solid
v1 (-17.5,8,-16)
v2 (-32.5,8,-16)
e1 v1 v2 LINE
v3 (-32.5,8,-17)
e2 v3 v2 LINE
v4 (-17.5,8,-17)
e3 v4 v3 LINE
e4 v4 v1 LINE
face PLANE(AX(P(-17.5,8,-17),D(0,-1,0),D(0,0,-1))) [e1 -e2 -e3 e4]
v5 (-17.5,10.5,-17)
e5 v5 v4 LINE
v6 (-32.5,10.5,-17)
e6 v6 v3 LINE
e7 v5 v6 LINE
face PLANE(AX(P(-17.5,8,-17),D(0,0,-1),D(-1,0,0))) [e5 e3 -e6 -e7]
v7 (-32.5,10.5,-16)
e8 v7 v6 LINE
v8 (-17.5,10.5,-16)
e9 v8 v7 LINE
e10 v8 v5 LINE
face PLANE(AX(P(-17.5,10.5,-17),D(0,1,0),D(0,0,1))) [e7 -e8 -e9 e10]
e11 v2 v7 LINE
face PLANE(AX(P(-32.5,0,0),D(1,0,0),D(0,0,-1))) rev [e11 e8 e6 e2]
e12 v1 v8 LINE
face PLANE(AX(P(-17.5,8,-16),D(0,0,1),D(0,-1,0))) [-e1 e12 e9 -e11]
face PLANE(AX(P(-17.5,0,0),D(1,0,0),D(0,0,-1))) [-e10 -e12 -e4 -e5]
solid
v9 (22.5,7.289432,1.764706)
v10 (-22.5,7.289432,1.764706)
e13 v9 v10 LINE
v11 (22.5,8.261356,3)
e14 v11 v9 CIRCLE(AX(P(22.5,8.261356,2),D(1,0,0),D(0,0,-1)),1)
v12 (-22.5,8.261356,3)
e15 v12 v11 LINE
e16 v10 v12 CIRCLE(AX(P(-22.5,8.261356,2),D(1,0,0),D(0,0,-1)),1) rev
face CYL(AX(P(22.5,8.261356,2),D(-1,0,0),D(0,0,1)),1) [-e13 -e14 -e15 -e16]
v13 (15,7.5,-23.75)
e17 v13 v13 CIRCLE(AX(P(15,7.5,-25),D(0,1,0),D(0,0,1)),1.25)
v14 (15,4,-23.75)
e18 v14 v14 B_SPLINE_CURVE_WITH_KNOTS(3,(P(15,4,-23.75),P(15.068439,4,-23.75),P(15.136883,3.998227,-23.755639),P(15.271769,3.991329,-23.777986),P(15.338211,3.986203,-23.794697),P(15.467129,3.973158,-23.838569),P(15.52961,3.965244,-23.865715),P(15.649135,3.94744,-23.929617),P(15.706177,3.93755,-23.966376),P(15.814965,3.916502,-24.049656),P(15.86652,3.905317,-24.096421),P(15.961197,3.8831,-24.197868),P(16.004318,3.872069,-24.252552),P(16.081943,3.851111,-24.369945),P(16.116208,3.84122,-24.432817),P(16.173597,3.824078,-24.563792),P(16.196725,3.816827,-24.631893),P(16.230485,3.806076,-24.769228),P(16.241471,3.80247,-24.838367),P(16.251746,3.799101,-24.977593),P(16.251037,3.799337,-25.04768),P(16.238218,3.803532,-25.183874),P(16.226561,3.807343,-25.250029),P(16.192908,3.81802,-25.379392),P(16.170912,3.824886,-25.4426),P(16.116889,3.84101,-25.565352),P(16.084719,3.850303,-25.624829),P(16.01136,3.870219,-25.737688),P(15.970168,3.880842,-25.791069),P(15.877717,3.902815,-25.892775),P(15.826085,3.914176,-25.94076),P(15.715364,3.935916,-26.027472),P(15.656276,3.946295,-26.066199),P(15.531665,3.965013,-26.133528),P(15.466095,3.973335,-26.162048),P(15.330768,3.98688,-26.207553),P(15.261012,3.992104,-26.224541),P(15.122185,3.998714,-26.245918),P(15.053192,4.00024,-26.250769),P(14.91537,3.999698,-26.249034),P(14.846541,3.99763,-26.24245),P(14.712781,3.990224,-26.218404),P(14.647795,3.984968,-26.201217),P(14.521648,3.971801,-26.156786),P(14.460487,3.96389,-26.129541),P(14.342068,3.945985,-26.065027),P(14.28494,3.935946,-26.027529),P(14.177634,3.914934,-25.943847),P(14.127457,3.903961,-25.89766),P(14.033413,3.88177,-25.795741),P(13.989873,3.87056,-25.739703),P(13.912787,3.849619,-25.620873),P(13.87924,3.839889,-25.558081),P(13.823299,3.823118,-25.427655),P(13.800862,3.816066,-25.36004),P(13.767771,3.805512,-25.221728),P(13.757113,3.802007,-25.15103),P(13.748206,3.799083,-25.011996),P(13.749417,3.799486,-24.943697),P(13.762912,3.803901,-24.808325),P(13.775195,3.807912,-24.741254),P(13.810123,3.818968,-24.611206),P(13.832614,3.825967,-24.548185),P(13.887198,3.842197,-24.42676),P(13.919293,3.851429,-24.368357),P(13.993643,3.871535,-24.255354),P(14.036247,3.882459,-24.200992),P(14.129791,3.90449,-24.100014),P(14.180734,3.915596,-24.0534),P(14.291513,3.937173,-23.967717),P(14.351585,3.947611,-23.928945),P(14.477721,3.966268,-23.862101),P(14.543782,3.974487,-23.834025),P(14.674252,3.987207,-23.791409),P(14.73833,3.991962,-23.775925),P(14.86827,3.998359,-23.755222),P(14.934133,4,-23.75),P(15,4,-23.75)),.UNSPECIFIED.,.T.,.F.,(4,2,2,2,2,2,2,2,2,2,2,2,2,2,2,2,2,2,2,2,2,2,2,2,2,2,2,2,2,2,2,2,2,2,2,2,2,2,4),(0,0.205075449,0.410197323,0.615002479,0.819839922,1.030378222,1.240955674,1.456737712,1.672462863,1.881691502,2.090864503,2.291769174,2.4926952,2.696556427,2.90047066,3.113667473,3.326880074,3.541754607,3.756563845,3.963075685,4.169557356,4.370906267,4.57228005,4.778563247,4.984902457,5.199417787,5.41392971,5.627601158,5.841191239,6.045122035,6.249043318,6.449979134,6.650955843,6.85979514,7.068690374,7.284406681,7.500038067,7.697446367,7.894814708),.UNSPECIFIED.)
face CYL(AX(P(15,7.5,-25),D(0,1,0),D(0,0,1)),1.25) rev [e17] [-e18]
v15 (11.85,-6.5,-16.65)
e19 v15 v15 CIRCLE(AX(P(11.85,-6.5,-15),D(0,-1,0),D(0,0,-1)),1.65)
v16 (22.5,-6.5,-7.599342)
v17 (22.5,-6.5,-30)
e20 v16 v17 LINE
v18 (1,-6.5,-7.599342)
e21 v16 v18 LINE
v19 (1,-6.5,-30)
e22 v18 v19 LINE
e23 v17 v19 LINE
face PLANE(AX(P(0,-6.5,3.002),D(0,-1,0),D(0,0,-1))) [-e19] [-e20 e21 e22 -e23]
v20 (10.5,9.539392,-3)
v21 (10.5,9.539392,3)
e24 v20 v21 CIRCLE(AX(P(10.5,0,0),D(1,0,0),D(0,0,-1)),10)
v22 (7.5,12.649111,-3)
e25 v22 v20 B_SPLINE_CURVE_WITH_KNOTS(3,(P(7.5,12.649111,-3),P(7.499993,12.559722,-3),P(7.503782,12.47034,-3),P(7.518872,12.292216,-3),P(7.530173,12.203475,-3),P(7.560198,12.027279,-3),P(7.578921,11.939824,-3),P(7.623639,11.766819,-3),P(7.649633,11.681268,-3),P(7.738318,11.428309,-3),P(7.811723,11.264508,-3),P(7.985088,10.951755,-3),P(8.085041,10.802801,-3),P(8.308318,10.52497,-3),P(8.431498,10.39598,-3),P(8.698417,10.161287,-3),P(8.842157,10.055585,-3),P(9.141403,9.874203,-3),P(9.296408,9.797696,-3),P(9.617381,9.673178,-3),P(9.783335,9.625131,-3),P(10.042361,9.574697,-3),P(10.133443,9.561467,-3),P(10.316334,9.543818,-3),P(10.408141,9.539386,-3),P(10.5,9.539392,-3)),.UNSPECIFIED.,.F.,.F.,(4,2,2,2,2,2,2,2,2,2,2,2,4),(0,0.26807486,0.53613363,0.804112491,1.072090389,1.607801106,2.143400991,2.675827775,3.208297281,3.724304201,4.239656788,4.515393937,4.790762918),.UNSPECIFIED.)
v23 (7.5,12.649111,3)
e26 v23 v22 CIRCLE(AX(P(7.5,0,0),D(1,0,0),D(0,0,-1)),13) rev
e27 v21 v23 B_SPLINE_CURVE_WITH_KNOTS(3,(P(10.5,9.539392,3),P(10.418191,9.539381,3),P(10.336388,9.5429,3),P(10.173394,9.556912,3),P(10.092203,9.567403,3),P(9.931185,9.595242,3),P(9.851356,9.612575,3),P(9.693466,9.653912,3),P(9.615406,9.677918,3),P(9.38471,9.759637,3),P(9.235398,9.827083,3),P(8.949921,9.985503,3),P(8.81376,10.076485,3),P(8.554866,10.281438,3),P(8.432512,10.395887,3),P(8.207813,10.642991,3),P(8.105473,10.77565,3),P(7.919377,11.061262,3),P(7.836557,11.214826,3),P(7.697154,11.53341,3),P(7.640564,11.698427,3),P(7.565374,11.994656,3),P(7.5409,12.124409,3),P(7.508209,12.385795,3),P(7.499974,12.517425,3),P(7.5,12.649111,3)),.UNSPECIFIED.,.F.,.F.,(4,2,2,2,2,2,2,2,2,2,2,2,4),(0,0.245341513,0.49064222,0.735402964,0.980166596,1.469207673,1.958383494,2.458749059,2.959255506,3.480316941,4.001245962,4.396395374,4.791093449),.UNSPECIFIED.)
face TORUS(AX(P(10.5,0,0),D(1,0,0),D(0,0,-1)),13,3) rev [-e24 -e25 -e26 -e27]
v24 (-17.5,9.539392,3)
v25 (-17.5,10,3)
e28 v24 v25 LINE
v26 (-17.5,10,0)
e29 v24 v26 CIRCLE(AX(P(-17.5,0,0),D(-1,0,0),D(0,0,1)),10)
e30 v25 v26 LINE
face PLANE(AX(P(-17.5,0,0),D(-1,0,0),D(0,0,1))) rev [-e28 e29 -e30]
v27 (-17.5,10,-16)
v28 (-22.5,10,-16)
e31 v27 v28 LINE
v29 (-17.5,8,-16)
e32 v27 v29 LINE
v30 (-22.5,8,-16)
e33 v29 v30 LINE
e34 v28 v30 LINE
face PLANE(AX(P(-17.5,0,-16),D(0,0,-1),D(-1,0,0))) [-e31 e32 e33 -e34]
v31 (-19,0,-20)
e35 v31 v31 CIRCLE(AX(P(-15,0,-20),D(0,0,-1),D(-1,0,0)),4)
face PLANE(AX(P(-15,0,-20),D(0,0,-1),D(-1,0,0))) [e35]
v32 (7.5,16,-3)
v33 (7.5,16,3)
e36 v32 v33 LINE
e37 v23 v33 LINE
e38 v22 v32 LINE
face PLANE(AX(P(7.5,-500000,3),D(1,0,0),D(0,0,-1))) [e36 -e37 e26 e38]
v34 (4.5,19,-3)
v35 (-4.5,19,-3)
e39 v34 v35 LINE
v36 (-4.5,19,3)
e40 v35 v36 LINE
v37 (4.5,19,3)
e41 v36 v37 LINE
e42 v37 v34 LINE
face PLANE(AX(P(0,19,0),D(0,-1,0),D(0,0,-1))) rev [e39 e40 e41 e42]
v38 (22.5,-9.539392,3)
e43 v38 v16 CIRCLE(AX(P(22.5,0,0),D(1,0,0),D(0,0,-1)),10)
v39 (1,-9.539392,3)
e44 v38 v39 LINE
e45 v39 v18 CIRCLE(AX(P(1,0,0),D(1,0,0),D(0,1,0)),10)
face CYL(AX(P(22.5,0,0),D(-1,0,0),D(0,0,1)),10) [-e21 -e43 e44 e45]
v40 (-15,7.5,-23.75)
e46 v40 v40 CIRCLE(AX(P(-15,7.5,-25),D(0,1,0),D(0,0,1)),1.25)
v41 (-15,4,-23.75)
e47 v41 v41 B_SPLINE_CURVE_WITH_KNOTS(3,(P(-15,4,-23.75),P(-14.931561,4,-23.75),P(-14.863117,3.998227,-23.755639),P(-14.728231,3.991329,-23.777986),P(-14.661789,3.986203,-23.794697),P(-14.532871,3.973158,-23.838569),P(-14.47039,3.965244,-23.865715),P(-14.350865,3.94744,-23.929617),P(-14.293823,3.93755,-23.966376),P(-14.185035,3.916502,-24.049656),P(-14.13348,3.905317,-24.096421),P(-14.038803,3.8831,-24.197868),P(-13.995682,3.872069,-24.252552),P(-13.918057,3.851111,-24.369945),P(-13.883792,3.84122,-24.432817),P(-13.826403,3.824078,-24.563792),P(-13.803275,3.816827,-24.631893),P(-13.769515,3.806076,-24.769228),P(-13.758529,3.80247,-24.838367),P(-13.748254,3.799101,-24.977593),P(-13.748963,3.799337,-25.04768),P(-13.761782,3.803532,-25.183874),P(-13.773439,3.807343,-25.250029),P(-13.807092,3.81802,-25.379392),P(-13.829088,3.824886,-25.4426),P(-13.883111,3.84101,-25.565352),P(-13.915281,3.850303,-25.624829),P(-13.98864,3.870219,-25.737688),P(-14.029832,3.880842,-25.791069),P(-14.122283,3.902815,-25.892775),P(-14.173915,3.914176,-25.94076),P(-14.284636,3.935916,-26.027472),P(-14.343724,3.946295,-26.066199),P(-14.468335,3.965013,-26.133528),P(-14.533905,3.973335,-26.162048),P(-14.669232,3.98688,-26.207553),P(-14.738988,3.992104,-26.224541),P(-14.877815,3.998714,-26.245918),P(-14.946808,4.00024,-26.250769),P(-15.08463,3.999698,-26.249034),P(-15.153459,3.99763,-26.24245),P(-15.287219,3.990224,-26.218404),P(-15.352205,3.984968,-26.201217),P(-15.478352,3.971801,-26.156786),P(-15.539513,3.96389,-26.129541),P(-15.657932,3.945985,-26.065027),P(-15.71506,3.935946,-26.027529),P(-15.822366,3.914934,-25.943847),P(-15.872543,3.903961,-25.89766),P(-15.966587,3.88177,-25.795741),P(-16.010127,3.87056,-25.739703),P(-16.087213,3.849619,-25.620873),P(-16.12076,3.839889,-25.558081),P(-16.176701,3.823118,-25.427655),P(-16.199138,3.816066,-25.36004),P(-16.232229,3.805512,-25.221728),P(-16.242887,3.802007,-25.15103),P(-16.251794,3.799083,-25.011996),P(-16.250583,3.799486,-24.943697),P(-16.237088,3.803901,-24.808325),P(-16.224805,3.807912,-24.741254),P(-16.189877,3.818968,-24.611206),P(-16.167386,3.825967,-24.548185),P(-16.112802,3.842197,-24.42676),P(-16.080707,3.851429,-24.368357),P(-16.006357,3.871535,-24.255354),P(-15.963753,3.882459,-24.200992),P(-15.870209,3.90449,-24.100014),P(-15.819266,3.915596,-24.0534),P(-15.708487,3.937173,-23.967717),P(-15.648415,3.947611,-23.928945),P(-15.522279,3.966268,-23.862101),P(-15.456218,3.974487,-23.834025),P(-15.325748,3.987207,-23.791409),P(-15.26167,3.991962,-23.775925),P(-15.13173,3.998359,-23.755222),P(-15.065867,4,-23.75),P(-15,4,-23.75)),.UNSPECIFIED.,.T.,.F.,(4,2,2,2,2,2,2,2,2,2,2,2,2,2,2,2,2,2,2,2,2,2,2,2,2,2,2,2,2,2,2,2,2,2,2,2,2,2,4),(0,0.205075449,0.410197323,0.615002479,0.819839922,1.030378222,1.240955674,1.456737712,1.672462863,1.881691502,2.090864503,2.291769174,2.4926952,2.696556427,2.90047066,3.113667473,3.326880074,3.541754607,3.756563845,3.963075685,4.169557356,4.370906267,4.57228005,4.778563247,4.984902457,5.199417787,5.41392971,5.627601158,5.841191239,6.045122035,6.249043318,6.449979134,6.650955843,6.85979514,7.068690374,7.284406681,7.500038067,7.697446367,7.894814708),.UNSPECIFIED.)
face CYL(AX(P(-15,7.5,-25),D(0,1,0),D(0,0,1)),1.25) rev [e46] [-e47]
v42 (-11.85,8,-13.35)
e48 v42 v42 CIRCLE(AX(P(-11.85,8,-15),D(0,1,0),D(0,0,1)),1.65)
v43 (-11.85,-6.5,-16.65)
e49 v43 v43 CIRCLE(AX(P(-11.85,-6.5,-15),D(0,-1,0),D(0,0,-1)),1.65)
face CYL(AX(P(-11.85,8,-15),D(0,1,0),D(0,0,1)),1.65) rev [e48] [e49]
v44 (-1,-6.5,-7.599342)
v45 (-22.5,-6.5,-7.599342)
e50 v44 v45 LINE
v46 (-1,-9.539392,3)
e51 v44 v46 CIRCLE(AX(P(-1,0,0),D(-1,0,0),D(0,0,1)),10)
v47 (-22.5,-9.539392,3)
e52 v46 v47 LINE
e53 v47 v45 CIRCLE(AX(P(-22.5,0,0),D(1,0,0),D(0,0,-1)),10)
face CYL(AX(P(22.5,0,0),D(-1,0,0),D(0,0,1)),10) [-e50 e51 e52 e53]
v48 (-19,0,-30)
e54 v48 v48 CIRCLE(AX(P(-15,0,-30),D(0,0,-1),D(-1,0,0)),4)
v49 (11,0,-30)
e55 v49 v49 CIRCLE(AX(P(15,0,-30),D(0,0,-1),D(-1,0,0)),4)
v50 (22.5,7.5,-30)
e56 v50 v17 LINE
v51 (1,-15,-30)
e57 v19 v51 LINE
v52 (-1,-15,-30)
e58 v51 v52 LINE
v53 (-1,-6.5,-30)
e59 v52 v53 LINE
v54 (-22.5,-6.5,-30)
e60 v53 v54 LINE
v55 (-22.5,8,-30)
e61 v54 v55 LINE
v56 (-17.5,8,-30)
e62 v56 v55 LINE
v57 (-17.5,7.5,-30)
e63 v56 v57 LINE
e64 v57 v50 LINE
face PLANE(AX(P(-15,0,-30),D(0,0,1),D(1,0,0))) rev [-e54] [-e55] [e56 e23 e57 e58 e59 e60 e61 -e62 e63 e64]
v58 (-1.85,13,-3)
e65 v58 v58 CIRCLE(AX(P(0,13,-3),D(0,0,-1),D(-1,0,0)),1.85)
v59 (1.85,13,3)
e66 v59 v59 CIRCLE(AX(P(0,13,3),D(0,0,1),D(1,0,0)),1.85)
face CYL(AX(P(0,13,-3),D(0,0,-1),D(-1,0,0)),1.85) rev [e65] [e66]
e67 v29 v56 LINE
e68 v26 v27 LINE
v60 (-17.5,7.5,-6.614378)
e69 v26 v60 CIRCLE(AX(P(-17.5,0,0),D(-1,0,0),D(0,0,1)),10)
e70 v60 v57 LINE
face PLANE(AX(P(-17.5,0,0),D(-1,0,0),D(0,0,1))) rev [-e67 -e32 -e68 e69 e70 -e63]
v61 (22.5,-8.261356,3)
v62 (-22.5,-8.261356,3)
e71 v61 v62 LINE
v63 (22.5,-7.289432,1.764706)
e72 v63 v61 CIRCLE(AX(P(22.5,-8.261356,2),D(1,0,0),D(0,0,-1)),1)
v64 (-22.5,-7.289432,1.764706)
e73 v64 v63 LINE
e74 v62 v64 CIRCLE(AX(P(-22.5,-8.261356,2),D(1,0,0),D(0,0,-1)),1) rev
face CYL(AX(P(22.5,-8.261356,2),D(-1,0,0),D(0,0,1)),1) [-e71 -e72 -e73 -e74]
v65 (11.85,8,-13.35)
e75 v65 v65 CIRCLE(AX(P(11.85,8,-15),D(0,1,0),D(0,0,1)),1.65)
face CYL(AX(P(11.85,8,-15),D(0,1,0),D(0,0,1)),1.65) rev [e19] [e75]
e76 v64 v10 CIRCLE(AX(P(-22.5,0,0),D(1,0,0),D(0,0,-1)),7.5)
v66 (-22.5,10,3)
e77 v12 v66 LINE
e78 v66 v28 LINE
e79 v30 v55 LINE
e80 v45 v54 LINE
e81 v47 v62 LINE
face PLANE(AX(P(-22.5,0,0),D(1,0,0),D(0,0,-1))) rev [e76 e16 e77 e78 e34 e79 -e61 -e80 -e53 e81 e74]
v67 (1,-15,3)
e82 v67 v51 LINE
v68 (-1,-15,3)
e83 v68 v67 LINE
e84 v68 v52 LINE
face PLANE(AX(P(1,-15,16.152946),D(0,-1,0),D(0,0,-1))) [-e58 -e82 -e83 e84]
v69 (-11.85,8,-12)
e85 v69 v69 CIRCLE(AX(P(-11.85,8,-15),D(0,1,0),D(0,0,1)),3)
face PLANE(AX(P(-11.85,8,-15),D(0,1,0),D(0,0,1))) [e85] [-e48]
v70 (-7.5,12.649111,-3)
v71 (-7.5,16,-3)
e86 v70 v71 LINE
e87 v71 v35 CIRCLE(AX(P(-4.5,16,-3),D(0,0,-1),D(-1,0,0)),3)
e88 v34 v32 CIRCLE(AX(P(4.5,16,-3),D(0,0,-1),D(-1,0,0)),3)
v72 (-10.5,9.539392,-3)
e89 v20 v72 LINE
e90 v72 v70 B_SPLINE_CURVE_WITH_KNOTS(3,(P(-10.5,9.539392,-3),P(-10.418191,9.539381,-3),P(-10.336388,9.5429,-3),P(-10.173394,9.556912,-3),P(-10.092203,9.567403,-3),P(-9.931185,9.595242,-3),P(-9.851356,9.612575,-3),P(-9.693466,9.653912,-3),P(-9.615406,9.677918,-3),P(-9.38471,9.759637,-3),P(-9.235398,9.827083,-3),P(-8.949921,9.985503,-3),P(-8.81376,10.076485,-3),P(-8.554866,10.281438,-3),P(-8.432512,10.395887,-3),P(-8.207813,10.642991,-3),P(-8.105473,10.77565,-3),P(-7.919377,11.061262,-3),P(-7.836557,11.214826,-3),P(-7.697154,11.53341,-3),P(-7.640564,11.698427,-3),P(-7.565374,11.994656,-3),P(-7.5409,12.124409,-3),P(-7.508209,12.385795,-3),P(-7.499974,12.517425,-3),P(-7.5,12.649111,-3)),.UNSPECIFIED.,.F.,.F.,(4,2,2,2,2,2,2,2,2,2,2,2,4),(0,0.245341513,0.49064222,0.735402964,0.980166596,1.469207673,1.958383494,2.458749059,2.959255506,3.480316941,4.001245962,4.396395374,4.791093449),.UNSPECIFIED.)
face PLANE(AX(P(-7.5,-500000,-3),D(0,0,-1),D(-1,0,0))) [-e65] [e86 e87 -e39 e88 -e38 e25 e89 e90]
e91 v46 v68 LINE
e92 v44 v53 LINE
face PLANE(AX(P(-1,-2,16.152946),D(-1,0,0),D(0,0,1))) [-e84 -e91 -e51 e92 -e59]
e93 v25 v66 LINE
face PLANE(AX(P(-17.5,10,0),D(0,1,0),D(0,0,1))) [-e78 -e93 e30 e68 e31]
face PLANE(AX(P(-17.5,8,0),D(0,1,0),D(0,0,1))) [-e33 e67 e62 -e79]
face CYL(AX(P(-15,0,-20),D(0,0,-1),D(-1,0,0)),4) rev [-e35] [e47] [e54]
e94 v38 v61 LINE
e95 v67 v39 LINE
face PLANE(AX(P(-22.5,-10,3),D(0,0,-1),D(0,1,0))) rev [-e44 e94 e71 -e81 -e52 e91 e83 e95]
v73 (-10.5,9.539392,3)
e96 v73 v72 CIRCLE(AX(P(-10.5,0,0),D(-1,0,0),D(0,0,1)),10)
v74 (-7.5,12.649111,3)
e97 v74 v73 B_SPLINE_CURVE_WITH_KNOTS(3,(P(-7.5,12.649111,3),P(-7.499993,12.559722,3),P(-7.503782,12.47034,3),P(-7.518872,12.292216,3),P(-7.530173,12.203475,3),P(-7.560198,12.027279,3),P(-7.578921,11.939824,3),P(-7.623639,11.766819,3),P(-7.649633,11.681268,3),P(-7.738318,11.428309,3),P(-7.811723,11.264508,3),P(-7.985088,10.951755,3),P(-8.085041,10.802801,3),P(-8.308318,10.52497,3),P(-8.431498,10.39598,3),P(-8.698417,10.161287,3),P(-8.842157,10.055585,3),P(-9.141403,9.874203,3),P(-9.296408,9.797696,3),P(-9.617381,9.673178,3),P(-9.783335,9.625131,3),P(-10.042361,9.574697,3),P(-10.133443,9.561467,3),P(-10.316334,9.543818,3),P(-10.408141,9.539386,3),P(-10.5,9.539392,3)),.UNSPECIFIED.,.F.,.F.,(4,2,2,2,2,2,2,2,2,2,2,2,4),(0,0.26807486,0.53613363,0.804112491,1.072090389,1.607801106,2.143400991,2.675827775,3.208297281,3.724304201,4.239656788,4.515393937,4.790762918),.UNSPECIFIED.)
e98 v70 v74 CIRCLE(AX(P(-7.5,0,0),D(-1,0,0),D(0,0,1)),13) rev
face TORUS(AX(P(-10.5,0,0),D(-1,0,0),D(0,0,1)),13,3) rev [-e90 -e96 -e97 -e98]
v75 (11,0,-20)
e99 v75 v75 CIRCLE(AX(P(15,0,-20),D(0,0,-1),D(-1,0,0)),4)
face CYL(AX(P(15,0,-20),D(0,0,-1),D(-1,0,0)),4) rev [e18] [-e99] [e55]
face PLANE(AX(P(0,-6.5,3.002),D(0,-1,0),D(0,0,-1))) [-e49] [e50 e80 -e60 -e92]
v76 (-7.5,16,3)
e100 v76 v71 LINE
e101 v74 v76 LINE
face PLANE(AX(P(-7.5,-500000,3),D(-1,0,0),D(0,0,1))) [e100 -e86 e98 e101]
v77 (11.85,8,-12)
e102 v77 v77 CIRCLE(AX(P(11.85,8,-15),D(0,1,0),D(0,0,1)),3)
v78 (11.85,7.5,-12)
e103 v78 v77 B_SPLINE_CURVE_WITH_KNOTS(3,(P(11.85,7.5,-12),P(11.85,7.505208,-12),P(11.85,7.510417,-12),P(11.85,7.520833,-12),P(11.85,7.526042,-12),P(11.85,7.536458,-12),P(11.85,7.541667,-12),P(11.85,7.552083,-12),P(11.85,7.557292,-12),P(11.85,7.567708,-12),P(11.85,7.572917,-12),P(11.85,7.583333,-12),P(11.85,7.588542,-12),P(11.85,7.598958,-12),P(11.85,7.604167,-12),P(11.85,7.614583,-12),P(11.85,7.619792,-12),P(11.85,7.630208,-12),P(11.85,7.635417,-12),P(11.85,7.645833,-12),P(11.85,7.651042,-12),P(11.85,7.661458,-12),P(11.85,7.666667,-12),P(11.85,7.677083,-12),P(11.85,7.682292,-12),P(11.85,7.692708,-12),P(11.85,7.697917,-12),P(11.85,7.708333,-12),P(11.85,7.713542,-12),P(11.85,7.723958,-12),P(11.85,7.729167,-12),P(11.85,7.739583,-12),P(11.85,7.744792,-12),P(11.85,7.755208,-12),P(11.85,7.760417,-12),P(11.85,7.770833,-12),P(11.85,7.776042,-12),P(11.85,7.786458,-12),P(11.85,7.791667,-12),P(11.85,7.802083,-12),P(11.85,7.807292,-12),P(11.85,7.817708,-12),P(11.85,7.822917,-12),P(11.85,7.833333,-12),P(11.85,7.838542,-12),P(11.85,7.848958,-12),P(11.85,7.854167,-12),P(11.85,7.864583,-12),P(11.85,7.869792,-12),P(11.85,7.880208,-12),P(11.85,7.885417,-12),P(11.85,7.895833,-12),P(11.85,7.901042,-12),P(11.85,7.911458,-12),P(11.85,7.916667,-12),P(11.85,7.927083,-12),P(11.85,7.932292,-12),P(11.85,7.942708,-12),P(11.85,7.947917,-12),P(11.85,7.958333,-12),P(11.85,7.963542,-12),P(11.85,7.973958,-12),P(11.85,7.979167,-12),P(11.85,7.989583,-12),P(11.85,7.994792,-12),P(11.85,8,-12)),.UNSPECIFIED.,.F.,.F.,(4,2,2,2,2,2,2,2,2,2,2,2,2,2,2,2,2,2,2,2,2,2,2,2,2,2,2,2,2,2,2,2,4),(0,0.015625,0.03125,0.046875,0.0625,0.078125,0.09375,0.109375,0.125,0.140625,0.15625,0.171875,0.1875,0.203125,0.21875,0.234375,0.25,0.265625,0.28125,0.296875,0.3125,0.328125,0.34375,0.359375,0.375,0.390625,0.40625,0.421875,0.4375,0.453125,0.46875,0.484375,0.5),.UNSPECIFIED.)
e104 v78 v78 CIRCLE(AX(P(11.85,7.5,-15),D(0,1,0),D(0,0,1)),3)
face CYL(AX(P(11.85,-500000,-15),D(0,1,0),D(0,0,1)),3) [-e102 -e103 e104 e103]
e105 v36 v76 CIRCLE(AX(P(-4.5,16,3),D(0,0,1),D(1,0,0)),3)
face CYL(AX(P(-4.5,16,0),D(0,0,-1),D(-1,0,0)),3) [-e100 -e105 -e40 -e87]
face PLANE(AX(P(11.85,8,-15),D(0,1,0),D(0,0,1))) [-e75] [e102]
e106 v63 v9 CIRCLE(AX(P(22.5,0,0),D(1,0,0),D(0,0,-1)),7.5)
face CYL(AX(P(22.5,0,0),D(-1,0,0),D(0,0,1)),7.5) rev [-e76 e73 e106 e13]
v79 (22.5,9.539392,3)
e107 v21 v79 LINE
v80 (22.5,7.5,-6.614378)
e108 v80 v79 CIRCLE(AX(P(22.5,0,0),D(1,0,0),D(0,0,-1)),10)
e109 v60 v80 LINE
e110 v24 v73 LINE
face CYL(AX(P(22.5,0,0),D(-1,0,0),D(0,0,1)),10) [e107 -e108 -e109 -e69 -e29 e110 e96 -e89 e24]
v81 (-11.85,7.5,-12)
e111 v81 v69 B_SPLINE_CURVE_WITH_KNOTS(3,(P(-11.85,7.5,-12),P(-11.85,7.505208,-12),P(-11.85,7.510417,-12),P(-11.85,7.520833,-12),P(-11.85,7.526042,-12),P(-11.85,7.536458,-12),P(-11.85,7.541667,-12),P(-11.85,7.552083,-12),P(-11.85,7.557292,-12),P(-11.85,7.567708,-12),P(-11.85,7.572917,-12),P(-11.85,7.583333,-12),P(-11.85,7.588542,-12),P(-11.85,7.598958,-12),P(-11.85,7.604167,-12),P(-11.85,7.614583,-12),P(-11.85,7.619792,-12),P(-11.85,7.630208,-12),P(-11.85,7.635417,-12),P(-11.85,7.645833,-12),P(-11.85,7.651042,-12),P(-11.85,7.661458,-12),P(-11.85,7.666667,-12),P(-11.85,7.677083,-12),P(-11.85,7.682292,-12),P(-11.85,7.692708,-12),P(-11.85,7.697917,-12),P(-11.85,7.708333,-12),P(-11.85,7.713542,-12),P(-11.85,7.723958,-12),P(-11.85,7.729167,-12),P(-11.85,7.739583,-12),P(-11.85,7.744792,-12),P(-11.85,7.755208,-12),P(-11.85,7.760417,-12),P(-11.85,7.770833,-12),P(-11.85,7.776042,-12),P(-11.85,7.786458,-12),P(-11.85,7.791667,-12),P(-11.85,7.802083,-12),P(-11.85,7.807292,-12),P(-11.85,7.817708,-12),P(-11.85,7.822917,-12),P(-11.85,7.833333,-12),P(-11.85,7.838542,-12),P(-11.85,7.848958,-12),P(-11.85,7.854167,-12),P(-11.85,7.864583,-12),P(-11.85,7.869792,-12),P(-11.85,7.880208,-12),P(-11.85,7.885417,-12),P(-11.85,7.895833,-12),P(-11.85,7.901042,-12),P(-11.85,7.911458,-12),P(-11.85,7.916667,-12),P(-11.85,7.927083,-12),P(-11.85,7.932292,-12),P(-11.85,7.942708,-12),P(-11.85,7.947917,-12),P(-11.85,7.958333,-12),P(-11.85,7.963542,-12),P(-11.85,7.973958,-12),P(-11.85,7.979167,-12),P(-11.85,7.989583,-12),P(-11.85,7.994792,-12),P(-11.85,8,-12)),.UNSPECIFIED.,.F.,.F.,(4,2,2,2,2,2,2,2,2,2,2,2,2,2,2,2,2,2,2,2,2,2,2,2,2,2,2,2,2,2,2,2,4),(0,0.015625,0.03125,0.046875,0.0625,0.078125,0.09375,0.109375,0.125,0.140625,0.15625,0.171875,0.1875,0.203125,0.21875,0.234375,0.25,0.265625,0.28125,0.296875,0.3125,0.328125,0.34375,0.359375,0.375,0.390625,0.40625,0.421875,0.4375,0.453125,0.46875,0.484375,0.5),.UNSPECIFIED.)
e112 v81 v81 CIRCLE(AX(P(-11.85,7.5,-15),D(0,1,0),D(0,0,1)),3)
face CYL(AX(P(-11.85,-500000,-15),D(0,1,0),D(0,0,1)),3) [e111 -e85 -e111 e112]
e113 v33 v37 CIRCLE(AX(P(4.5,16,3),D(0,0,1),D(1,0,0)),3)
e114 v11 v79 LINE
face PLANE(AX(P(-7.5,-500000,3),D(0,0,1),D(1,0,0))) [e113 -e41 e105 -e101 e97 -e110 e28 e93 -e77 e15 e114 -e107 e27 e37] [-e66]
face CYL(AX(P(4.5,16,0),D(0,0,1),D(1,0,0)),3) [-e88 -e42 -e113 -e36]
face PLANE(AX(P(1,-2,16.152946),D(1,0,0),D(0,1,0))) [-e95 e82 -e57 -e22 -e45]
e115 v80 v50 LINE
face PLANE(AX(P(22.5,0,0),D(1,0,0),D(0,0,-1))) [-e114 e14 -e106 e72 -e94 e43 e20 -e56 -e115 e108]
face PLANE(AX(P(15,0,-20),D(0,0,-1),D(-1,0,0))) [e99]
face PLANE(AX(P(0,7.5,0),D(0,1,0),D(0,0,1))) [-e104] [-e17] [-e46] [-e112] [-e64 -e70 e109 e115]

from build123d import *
from build123d.topology import SkipClean

# Parameters (mm, degrees)
SKETCH2_R                      = 10
SKETCH2_R_2                    = 7.5
BOSS_EXTRUDE1_DEPTH            = 22.5
BOSS_EXTRUDE2_REACH            = 58.575
BOSS_EXTRUDE2_END_RADIUS       = 10
BOSS_EXTRUDE2_START            = -30
BOSS_EXTRUDE4_REACH            = 59.81
BOSS_EXTRUDE4_END_RADIUS       = 10
BOSS_EXTRUDE4_START            = 19
SKETCH5_W                      = 15
SKETCH5_H                      = 6
BOSS_EXTRUDE5_REACH            = 52.039
BOSS_EXTRUDE5_START            = 8
SKETCH6_R                      = 3
BOSS_EXTRUDE6_REACH            = 59.039
BOSS_EXTRUDE6_START            = -15
SKETCH7_R                      = 3.25
BOSS_EXTRUDE7_REACH            = 46.491
BOSS_EXTRUDE7_START            = -0.5
SKETCH9_W                      = 2.5
SKETCH9_H                      = 10.75
BOSS_EXTRUDE8_REACH            = 54.119
BOSS_EXTRUDE8_START            = -1.5
SKETCH10_W                     = 17
SKETCH10_H                     = 2.5
CUT_EXTRUDE2_DEPTH             = 43.038672797
CUT_EXTRUDE2_DEPTH_BACK        = 43.038672797
SKETCH11_W                     = 10.458909091
SKETCH11_H                     = 30
FILLET1_R                      = 1
M3X0_5_TAPPED_HOLE1_D          = 2.75
M3X0_5_TAPPED_HOLE1_DEPTH      = 8.5
M3X0_5_TAPPED_HOLE1_TIP        = 0.826183351
SKETCH14_R                     = 4
CUT_EXTRUDE3_DEPTH             = 10
M4X0_7_TAPPED_HOLE2_D          = 3.7
M4X0_7_TAPPED_HOLE2_DEPTH      = 11.5
M4X0_7_TAPPED_HOLE2_TIP        = 1.111592145
BOSS_EXTRUDE9_REACH            = 45.732
DELETEFACE1_START              = -28.2500001
DELETEFACE1_DEPTH              = 6.5000001
BOSS_EXTRUDE10_REACH           = 46.23
SKETCH20_W                     = 2
SKETCH20_H                     = 13
DELETEFACE2_START              = -1
DELETEFACE2_DEPTH              = 2
BOSS_EXTRUDE12_REACH           = 46.23
BOSS_EXTRUDE12_END_RADIUS      = 10
M4X0_7_TAPPED_HOLE1_D          = 3.3
M4X0_7_TAPPED_HOLE1_DEPTH      = 20
M4X0_7_TAPPED_HOLE1_TIP        = 0.991420021
BOSS_EXTRUDE11_DEPTH           = 10
BOSS_EXTRUDE11_DEPTH_BACK      = 5
SKETCH22_W                     = 1
SKETCH22_H                     = 2.5
BOSS_EXTRUDE13_START           = -5
BOSS_EXTRUDE13_DEPTH           = 5
SKETCH28_W                     = 1.25
SKETCH28_H                     = 7.5
M3X0_5_TAPPED_HOLE2_AT_2_COUNT = 2
M3X0_5_TAPPED_HOLE2_AT_2_PITCH = 30
FILLET4_R                      = 3


# Read off the part's stored shape, not the designer's step: DeleteFace1, DeleteFace2
with BuildPart() as part:
    # Sketch2 → Boss-Extrude1 (new, symmetric)
    with BuildSketch(Plane(origin=(0, 0, 0), x_dir=(0, 0, -1), z_dir=(1, 0, 0))):
        with Locations(Location((0, 0, 0), (0, 0, 180))):
            Circle(SKETCH2_R)
        with Locations(Location((0, 0, 0), (0, 0, 180))):
            Circle(SKETCH2_R_2, mode=Mode.SUBTRACT)
    extrude(amount=BOSS_EXTRUDE1_DEPTH, both=True)

    # Boss-Extrude2: up to this cylinder (the profile starts outside it)
    boss_extrude2_end = Plane(origin=(0, 0, 0), z_dir=(-1, 0, 0)) * Cylinder(BOSS_EXTRUDE2_END_RADIUS, 138.15, mode=Mode.PRIVATE)
    # Sketch3 → Boss-Extrude2 (add, up to the surface)
    with BuildSketch(Plane.XY.offset(BOSS_EXTRUDE2_START), mode=Mode.PRIVATE) as boss_extrude2_sk1:
        with BuildLine():
            Line((-8.815341562, 2), (8.815341562, 2))
            ThreePointArc((8.815341562, 2), (21.5, 0), (8.815341562, -2))
            Line((8.815341562, -2), (-8.815341562, -2))
            ThreePointArc((-8.815341562, -2), (-21.5, 0), (-8.815341562, 2))
        make_face()
    boss_extrude2_tool1 = extrude(boss_extrude2_sk1.sketch, amount=BOSS_EXTRUDE2_REACH, mode=Mode.PRIVATE) - boss_extrude2_end
    add(boss_extrude2_tool1.solids().sort_by_distance((0, 0, -30))[0])

    # Boss-Extrude4: up to this cylinder (the profile starts outside it)
    boss_extrude4_end = Plane(origin=(0, 0, 0), z_dir=(-1, 0, 0)) * Cylinder(BOSS_EXTRUDE4_END_RADIUS, 140.62, mode=Mode.PRIVATE)
    # Sketch5 → Boss-Extrude4 (add, up to the surface)
    with BuildSketch(Plane(origin=(0, 0, 0), x_dir=(1, 0, 0), z_dir=(0, 1, 0)).offset(BOSS_EXTRUDE4_START), mode=Mode.PRIVATE) as boss_extrude4_sk1:
        Rectangle(SKETCH5_W, SKETCH5_H)
    boss_extrude4_tool1 = extrude(boss_extrude4_sk1.sketch, amount=-BOSS_EXTRUDE4_REACH, mode=Mode.PRIVATE) - boss_extrude4_end
    add(boss_extrude4_tool1.solids().sort_by_distance((0, 19, 0))[0])

    # Sketch6 → Boss-Extrude5 (add, up to next)
    with BuildSketch(Plane(origin=(0, 0, 0), x_dir=(1, 0, 0), z_dir=(0, 1, 0)).offset(BOSS_EXTRUDE5_START), mode=Mode.PRIVATE) as boss_extrude5_sk1:
        with Locations(Location((-11.85, 15, 0), (0, 0, 270))):
            Circle(SKETCH6_R)
    boss_extrude5_tool1 = extrude(boss_extrude5_sk1.sketch, amount=-BOSS_EXTRUDE5_REACH, mode=Mode.PRIVATE) - part.part
    # Sketch6 → Boss-Extrude5 (add, up to next)
    with BuildSketch(Plane(origin=(0, 0, 0), x_dir=(1, 0, 0), z_dir=(0, 1, 0)).offset(BOSS_EXTRUDE5_START), mode=Mode.PRIVATE) as boss_extrude5_sk2:
        with Locations(Location((11.85, 15, 0), (0, 0, 270))):
            Circle(SKETCH6_R)
    boss_extrude5_tool2 = extrude(boss_extrude5_sk2.sketch, amount=-BOSS_EXTRUDE5_REACH, mode=Mode.PRIVATE) - part.part
    add(boss_extrude5_tool1.solids().sort_by_distance((-11.85, 8, -15))[0])
    add(boss_extrude5_tool2.solids().sort_by_distance((11.85, 8, -15))[0])

    # Sketch7 → Boss-Extrude6 (add, up to next)
    with BuildSketch(Plane(origin=(0, 0, 0), x_dir=(1, 0, 0), z_dir=(0, 1, 0)).offset(BOSS_EXTRUDE6_START), mode=Mode.PRIVATE) as boss_extrude6_sk1:
        with Locations(Location((-11.5, 25, 0), (0, 0, 34.305037018))):
            Circle(SKETCH7_R)
    boss_extrude6_tool1 = extrude(boss_extrude6_sk1.sketch, amount=BOSS_EXTRUDE6_REACH, mode=Mode.PRIVATE) - part.part
    # Sketch7 → Boss-Extrude6 (add, up to next)
    with BuildSketch(Plane(origin=(0, 0, 0), x_dir=(1, 0, 0), z_dir=(0, 1, 0)).offset(BOSS_EXTRUDE6_START), mode=Mode.PRIVATE) as boss_extrude6_sk2:
        with Locations(Location((11.5, 25, 0), (0, 0, 145.694962982))):
            Circle(SKETCH7_R)
    boss_extrude6_tool2 = extrude(boss_extrude6_sk2.sketch, amount=BOSS_EXTRUDE6_REACH, mode=Mode.PRIVATE) - part.part
    add(boss_extrude6_tool1.solids().sort_by_distance((-11.5, -15, -25))[0])
    add(boss_extrude6_tool2.solids().sort_by_distance((11.5, -15, -25))[0])

    # Sketch9 → Boss-Extrude7 (add, up to next)
    with BuildSketch(Plane(origin=(0, 8, 0), x_dir=(1, 0, 0), z_dir=(0, 1, 0)).offset(BOSS_EXTRUDE7_START), mode=Mode.PRIVATE) as boss_extrude7_sk1:
        with Locations((0, 8.375)):
            Rectangle(SKETCH9_W, SKETCH9_H)
    boss_extrude7_tool1 = extrude(boss_extrude7_sk1.sketch, amount=-BOSS_EXTRUDE7_REACH, mode=Mode.PRIVATE) - part.part
    # Sketch9 → Boss-Extrude7 (add, up to next)
    with BuildSketch(Plane(origin=(0, 8, 0), x_dir=(1, 0, 0), z_dir=(0, 1, 0)).offset(BOSS_EXTRUDE7_START), mode=Mode.PRIVATE) as boss_extrude7_sk2:
        with BuildLine():
            Line((-9.122821971, 16.25), (-9.122821971, 13.75))
            Line((-9.122821971, 13.75), (-1.25, 13.75))
            Line((-1.25, 13.75), (1.25, 13.75))
            Line((1.25, 13.75), (9.122821971, 13.75))
            ThreePointArc((9.122821971, 13.75), (8.85, 15), (9.122821971, 16.25))
            Line((9.122821971, 16.25), (-9.122821971, 16.25))
        make_face()
    boss_extrude7_tool2 = extrude(boss_extrude7_sk2.sketch, amount=-BOSS_EXTRUDE7_REACH, mode=Mode.PRIVATE) - part.part
    add(boss_extrude7_tool1.solids().sort_by_distance((0, 7.5, -8.375))[0])
    add(boss_extrude7_tool2.solids().sort_by_distance((-0.091621, 7.5, -15))[0])

    # Sketch10 → Boss-Extrude8 (add, up to next)
    with BuildSketch(Plane.XZ.offset(15).offset(BOSS_EXTRUDE8_START), mode=Mode.PRIVATE) as boss_extrude8_sk1:
        with Locations((0, -25)):
            Rectangle(SKETCH10_W, SKETCH10_H)
    boss_extrude8_tool1 = extrude(boss_extrude8_sk1.sketch, amount=-BOSS_EXTRUDE8_REACH, mode=Mode.PRIVATE) - part.part
    add(boss_extrude8_tool1.solids().sort_by_distance((0, -13.5, -25))[0])

    # Sketch11 → Cut-Extrude2 (cut, two sides: drawn at the far end of the back side and taken through both)
    with BuildSketch(Plane(origin=(0, 0, 0), x_dir=(0, 0, -1), z_dir=(1, 0, 0)).offset(-CUT_EXTRUDE2_DEPTH_BACK)):
        with Locations((-8.229454546, 5)):
            Rectangle(SKETCH11_W, SKETCH11_H)
    extrude(amount=CUT_EXTRUDE2_DEPTH + CUT_EXTRUDE2_DEPTH_BACK, mode=Mode.SUBTRACT)

    # Fillet1
    fillet1_edges = [part.edges().sort_by_distance(p)[0] for p in [
        (0, -6.873863542, 3),
        (0, 6.873863542, 3),
    ]]
    fillet(fillet1_edges, radius=FILLET1_R)

    # M3x0.5 Tapped Hole1
    with Locations(Plane(origin=(0, -15, 0), x_dir=(-1, 0, 0), z_dir=(0, -1, 0))):
        with Locations((-11.5, 25), (11.5, 25)):
            Hole(M3X0_5_TAPPED_HOLE1_D / 2, depth=M3X0_5_TAPPED_HOLE1_DEPTH)
            with Locations((0, 0, -(M3X0_5_TAPPED_HOLE1_DEPTH + M3X0_5_TAPPED_HOLE1_TIP / 2))):  # 118° drill point
                Cone(0, M3X0_5_TAPPED_HOLE1_D / 2, M3X0_5_TAPPED_HOLE1_TIP, mode=Mode.SUBTRACT)

    # Sketch14 → Cut-Extrude3 (cut)
    with BuildSketch(Plane(origin=(0, 0, -30), x_dir=(-1, 0, 0), z_dir=(0, 0, -1))):
        with Locations((-15, 0)):
            Circle(SKETCH14_R)
        with Locations((15, 0)):
            Circle(SKETCH14_R)
    extrude(amount=-CUT_EXTRUDE3_DEPTH, mode=Mode.SUBTRACT)

    # M4x0.7 Tapped Hole2
    with Locations(Plane(origin=(0, 0, -3), x_dir=(-1, 0, 0), z_dir=(0, 0, -1))):
        with Locations((0, 13)):
            Hole(M4X0_7_TAPPED_HOLE2_D / 2, depth=M4X0_7_TAPPED_HOLE2_DEPTH)
            with Locations((0, 0, -(M4X0_7_TAPPED_HOLE2_DEPTH + M4X0_7_TAPPED_HOLE2_TIP / 2))):  # 118° drill point
                Cone(0, M4X0_7_TAPPED_HOLE2_D / 2, M4X0_7_TAPPED_HOLE2_TIP, mode=Mode.SUBTRACT)

    # Sketch19 → Boss-Extrude9 (add, up to next)
    with BuildSketch(Plane(origin=(0, 7.5, 0), x_dir=(1, 0, 0), z_dir=(0, 1, 0)), mode=Mode.PRIVATE) as boss_extrude9_sk1:
        with BuildLine():
            Line((1.25, 6.614378278), (14.85, 6.614378278))
            Line((14.85, 6.614378278), (14.85, 15))
            ThreePointArc((14.85, 15), (12.489713183, 12.068998969), (9.122821971, 13.75))
            Line((9.122821971, 13.75), (1.25, 13.75))
            Line((1.25, 13.75), (1.25, 6.614378278))
        make_face()
    boss_extrude9_tool1 = extrude(boss_extrude9_sk1.sketch, amount=-BOSS_EXTRUDE9_REACH, mode=Mode.PRIVATE) - part.part
    # Sketch19 → Boss-Extrude9 (add, up to next)
    with BuildSketch(Plane(origin=(0, 7.5, 0), x_dir=(1, 0, 0), z_dir=(0, 1, 0)), mode=Mode.PRIVATE) as boss_extrude9_sk2:
        with BuildLine():
            Line((-14.85, 6.614378278), (-1.25, 6.614378278))
            Line((-1.25, 6.614378278), (-1.25, 13.75))
            Line((-1.25, 13.75), (-9.122821971, 13.75))
            ThreePointArc((-9.122821971, 13.75), (-12.489713183, 12.068998969), (-14.85, 15))
            Line((-14.85, 15), (-14.85, 6.614378278))
        make_face()
    boss_extrude9_tool2 = extrude(boss_extrude9_sk2.sketch, amount=-BOSS_EXTRUDE9_REACH, mode=Mode.PRIVATE) - part.part
    add(boss_extrude9_tool1.solids().sort_by_distance((7.769594, 7.5, -9.9707))[0])
    add(boss_extrude9_tool2.solids().sort_by_distance((-7.769594, 7.5, -9.9707))[0])

    # DeleteFace1 outline → DeleteFace1 (cut)
    with SkipClean():  # the faces are left unmerged after this step: merging them gives an invalid solid
        with BuildSketch(Plane.XY.offset(DELETEFACE1_START)):
            with BuildLine():
                ThreePointArc((16, -6.422616289), (11.592646997, -5.535336079), (8.815341562, -2))
                Line((8.815341562, -2), (-8.815341562, -2))
                ThreePointArc((-8.815341562, -2), (-11.592646997, -5.535336079), (-16, -6.422616289))
                Line((-16, -6.422616289), (-16, -15))
                Line((-16, -15), (-3.317867395, -15))
                Line((-3.317867395, -15), (-3.802938645, -13.5))
                Line((-3.802938645, -13.5), (3.802938645, -13.5))
                Line((3.802938645, -13.5), (3.317867395, -15))
                Line((3.317867395, -15), (16, -15))
                Line((16, -15), (16, -6.422616289))
            make_face()
        extrude(amount=DELETEFACE1_DEPTH, mode=Mode.SUBTRACT)

    # Boss-Extrude10: up to this face of the body (flat: up to its plane)
    boss_extrude10_end = Plane(part.part.faces().sort_by_distance((0, -8.900373918, 3))[0])
    # Sketch20 → Boss-Extrude10 (add, up to the picked face)
    with BuildSketch(Plane(origin=(0, 0, -30), x_dir=(-1, 0, 0), z_dir=(0, 0, -1)), mode=Mode.PRIVATE) as boss_extrude10_sk1:
        with Locations((0, -8.5)):
            Rectangle(SKETCH20_W, SKETCH20_H)
    boss_extrude10_tool1 = split(extrude(boss_extrude10_sk1.sketch, amount=-BOSS_EXTRUDE10_REACH, mode=Mode.PRIVATE), bisect_by=boss_extrude10_end, keep=Keep.BOTH, mode=Mode.PRIVATE)
    add(boss_extrude10_tool1.solids().sort_by(Axis((0, -8.5, -30), (0, 0, 1)))[0])

    # DeleteFace2 outline → DeleteFace2 (cut)
    with SkipClean():  # the faces are left unmerged after this step: merging them gives an invalid solid
        with BuildSketch(Plane.YZ.offset(DELETEFACE2_START)):
            with BuildLine():
                ThreePointArc((-7.289431607, 1.764705882), (-6.464707716, -3.802309055), (-2, -7.228416147))
                Line((-2, -7.228416147), (-2, 3))
                Line((-2, 3), (-8.261355821, 3))
                ThreePointArc((-8.261355821, 3), (-7.475450573, 2.618346942), (-7.289431607, 1.764705882))
            make_face()
        extrude(amount=DELETEFACE2_DEPTH, mode=Mode.SUBTRACT)

    # Boss-Extrude12: up to this cylinder (the profile starts outside it)
    boss_extrude12_end = Plane(origin=(0, 0, 0), z_dir=(-1, 0, 0)) * Cylinder(BOSS_EXTRUDE12_END_RADIUS, 125.136314, mode=Mode.PRIVATE)
    # Sketch23 → Boss-Extrude12 (add, up to the surface)
    with BuildSketch(Plane(origin=(0, 0, -30), x_dir=(-1, 0, 0), z_dir=(0, 0, -1)), mode=Mode.PRIVATE) as boss_extrude12_sk1:
        with BuildLine():
            Line((22.5, 7.5), (-22.5, 7.5))
            Line((-22.5, 7.5), (-22.5, -6.5))
            Line((-22.5, -6.5), (-14.999999993, -6.5))
            ThreePointArc((-14.999999993, -6.5), (-20.255949012, 3.824264632), (-8.815341562, 2))
            Line((-8.815341562, 2), (8.815341562, 2))
            ThreePointArc((8.815341562, 2), (20.25594901, 3.824264635), (15, -6.5))
            Line((15, -6.5), (22.5, -6.5))
            Line((22.5, -6.5), (22.5, 7.5))
        make_face()
    boss_extrude12_tool1 = extrude(boss_extrude12_sk1.sketch, amount=-BOSS_EXTRUDE12_REACH, mode=Mode.PRIVATE) - boss_extrude12_end
    add(boss_extrude12_tool1.solids().sort_by_distance((0, 3.628261, -30))[0])
    # Sketch23 → Boss-Extrude12 (add, up to the surface)
    with BuildSketch(Plane(origin=(0, 0, -30), x_dir=(-1, 0, 0), z_dir=(0, 0, -1)), mode=Mode.PRIVATE) as boss_extrude12_sk2:
        with BuildLine():
            ThreePointArc((-8.815341562, -2), (-11.175735362, -5.255949008), (-14.999999993, -6.5))
            Line((-14.999999993, -6.5), (-1, -6.5))
            Line((-1, -6.5), (-1, -2))
            Line((-1, -2), (-8.815341562, -2))
        make_face()
    boss_extrude12_tool2 = extrude(boss_extrude12_sk2.sketch, amount=-BOSS_EXTRUDE12_REACH, mode=Mode.PRIVATE) - boss_extrude12_end
    add(boss_extrude12_tool2.solids().sort_by_distance((5.838157, -4.433255, -30))[0])
    # Sketch23 → Boss-Extrude12 (add, up to the surface)
    with BuildSketch(Plane(origin=(0, 0, -30), x_dir=(-1, 0, 0), z_dir=(0, 0, -1)), mode=Mode.PRIVATE) as boss_extrude12_sk3:
        with BuildLine():
            Line((1, -6.5), (15, -6.5))
            ThreePointArc((15, -6.5), (11.175735365, -5.25594901), (8.815341562, -2))
            Line((8.815341562, -2), (1, -2))
            Line((1, -2), (1, -6.5))
        make_face()
    boss_extrude12_tool3 = extrude(boss_extrude12_sk3.sketch, amount=-BOSS_EXTRUDE12_REACH, mode=Mode.PRIVATE) - boss_extrude12_end
    add(boss_extrude12_tool3.solids().sort_by_distance((-5.838157, -4.433255, -30))[0])

    # M4x0.7 Tapped Hole1
    with Locations(Plane(origin=(0, 8, 0), x_dir=(1, 0, 0), z_dir=(0, 1, 0))):
        with Locations((11.85, 15), (-11.85, 15)):
            Hole(M4X0_7_TAPPED_HOLE1_D / 2, depth=M4X0_7_TAPPED_HOLE1_DEPTH)
            with Locations((0, 0, -(M4X0_7_TAPPED_HOLE1_DEPTH + M4X0_7_TAPPED_HOLE1_TIP / 2))):  # 118° drill point
                Cone(0, M4X0_7_TAPPED_HOLE1_D / 2, M4X0_7_TAPPED_HOLE1_TIP, mode=Mode.SUBTRACT)

    # Sketch24 → Boss-Extrude13 (add)
    with BuildSketch(Plane.ZY.offset(22.5).offset(BOSS_EXTRUDE13_START)):
        with BuildLine():
            ThreePointArc((-6.614378278, 7.5), (-3.535533906, 9.354143467), (0, 10))
            Line((0, 10), (-16, 10))
            Line((-16, 10), (-16, 8))
            Line((-16, 8), (-30, 8))
            Line((-30, 8), (-30, 7.5))
            Line((-30, 7.5), (-6.614378278, 7.5))
        make_face()
        with BuildLine():
            ThreePointArc((0, 10), (1.517576993, 9.884177258), (3, 9.539392014))
            Line((3, 9.539392014), (3, 10))
            Line((3, 10), (0, 10))
        make_face()
    extrude(amount=BOSS_EXTRUDE13_DEPTH)

    # Sketch28 → M3x0.5 Tapped Hole2 (revolve, cut)
    with BuildSketch(Plane(origin=(-15, 7.5, -25), x_dir=(0, 0, 1), z_dir=(1, 0, 0))):
        with Locations((0.625, 3.75)):
            Rectangle(SKETCH28_W, SKETCH28_H)
    m3x0_5_tapped_hole2 = revolve(axis=Axis((-15, 13.85, -25), (0, -1, 0)), mode=Mode.SUBTRACT)

    # M3x0.5 Tapped Hole2 at 2: M3x0.5 Tapped Hole2 ×2
    with Locations(*[(i * M3X0_5_TAPPED_HOLE2_AT_2_PITCH, 0, 0) for i in range(1, M3X0_5_TAPPED_HOLE2_AT_2_COUNT)]):
        add(m3x0_5_tapped_hole2, mode=Mode.SUBTRACT)

    # Fillet4
    fillet4_edges = [part.edges().sort_by_distance(p)[0] for p in [
        (7.5, 10, 0),
        (-7.5, 10, 0),
        (7.5, 19, 0),
        (-7.5, 19, 0),
    ]]
    fillet(fillet4_edges, radius=FILLET4_R)


with BuildPart() as body_2:
    # Sketch22 → Boss-Extrude11 (new, two sides: drawn at the far end of the back side and taken through both)
    with BuildSketch(Plane.ZY.offset(22.5).offset(-BOSS_EXTRUDE11_DEPTH_BACK)):
        with Locations((-16.5, 9.25)):
            Rectangle(SKETCH22_W, SKETCH22_H)
    extrude(amount=BOSS_EXTRUDE11_DEPTH + BOSS_EXTRUDE11_DEPTH_BACK)


solid = Compound([part.part, body_2.part])
